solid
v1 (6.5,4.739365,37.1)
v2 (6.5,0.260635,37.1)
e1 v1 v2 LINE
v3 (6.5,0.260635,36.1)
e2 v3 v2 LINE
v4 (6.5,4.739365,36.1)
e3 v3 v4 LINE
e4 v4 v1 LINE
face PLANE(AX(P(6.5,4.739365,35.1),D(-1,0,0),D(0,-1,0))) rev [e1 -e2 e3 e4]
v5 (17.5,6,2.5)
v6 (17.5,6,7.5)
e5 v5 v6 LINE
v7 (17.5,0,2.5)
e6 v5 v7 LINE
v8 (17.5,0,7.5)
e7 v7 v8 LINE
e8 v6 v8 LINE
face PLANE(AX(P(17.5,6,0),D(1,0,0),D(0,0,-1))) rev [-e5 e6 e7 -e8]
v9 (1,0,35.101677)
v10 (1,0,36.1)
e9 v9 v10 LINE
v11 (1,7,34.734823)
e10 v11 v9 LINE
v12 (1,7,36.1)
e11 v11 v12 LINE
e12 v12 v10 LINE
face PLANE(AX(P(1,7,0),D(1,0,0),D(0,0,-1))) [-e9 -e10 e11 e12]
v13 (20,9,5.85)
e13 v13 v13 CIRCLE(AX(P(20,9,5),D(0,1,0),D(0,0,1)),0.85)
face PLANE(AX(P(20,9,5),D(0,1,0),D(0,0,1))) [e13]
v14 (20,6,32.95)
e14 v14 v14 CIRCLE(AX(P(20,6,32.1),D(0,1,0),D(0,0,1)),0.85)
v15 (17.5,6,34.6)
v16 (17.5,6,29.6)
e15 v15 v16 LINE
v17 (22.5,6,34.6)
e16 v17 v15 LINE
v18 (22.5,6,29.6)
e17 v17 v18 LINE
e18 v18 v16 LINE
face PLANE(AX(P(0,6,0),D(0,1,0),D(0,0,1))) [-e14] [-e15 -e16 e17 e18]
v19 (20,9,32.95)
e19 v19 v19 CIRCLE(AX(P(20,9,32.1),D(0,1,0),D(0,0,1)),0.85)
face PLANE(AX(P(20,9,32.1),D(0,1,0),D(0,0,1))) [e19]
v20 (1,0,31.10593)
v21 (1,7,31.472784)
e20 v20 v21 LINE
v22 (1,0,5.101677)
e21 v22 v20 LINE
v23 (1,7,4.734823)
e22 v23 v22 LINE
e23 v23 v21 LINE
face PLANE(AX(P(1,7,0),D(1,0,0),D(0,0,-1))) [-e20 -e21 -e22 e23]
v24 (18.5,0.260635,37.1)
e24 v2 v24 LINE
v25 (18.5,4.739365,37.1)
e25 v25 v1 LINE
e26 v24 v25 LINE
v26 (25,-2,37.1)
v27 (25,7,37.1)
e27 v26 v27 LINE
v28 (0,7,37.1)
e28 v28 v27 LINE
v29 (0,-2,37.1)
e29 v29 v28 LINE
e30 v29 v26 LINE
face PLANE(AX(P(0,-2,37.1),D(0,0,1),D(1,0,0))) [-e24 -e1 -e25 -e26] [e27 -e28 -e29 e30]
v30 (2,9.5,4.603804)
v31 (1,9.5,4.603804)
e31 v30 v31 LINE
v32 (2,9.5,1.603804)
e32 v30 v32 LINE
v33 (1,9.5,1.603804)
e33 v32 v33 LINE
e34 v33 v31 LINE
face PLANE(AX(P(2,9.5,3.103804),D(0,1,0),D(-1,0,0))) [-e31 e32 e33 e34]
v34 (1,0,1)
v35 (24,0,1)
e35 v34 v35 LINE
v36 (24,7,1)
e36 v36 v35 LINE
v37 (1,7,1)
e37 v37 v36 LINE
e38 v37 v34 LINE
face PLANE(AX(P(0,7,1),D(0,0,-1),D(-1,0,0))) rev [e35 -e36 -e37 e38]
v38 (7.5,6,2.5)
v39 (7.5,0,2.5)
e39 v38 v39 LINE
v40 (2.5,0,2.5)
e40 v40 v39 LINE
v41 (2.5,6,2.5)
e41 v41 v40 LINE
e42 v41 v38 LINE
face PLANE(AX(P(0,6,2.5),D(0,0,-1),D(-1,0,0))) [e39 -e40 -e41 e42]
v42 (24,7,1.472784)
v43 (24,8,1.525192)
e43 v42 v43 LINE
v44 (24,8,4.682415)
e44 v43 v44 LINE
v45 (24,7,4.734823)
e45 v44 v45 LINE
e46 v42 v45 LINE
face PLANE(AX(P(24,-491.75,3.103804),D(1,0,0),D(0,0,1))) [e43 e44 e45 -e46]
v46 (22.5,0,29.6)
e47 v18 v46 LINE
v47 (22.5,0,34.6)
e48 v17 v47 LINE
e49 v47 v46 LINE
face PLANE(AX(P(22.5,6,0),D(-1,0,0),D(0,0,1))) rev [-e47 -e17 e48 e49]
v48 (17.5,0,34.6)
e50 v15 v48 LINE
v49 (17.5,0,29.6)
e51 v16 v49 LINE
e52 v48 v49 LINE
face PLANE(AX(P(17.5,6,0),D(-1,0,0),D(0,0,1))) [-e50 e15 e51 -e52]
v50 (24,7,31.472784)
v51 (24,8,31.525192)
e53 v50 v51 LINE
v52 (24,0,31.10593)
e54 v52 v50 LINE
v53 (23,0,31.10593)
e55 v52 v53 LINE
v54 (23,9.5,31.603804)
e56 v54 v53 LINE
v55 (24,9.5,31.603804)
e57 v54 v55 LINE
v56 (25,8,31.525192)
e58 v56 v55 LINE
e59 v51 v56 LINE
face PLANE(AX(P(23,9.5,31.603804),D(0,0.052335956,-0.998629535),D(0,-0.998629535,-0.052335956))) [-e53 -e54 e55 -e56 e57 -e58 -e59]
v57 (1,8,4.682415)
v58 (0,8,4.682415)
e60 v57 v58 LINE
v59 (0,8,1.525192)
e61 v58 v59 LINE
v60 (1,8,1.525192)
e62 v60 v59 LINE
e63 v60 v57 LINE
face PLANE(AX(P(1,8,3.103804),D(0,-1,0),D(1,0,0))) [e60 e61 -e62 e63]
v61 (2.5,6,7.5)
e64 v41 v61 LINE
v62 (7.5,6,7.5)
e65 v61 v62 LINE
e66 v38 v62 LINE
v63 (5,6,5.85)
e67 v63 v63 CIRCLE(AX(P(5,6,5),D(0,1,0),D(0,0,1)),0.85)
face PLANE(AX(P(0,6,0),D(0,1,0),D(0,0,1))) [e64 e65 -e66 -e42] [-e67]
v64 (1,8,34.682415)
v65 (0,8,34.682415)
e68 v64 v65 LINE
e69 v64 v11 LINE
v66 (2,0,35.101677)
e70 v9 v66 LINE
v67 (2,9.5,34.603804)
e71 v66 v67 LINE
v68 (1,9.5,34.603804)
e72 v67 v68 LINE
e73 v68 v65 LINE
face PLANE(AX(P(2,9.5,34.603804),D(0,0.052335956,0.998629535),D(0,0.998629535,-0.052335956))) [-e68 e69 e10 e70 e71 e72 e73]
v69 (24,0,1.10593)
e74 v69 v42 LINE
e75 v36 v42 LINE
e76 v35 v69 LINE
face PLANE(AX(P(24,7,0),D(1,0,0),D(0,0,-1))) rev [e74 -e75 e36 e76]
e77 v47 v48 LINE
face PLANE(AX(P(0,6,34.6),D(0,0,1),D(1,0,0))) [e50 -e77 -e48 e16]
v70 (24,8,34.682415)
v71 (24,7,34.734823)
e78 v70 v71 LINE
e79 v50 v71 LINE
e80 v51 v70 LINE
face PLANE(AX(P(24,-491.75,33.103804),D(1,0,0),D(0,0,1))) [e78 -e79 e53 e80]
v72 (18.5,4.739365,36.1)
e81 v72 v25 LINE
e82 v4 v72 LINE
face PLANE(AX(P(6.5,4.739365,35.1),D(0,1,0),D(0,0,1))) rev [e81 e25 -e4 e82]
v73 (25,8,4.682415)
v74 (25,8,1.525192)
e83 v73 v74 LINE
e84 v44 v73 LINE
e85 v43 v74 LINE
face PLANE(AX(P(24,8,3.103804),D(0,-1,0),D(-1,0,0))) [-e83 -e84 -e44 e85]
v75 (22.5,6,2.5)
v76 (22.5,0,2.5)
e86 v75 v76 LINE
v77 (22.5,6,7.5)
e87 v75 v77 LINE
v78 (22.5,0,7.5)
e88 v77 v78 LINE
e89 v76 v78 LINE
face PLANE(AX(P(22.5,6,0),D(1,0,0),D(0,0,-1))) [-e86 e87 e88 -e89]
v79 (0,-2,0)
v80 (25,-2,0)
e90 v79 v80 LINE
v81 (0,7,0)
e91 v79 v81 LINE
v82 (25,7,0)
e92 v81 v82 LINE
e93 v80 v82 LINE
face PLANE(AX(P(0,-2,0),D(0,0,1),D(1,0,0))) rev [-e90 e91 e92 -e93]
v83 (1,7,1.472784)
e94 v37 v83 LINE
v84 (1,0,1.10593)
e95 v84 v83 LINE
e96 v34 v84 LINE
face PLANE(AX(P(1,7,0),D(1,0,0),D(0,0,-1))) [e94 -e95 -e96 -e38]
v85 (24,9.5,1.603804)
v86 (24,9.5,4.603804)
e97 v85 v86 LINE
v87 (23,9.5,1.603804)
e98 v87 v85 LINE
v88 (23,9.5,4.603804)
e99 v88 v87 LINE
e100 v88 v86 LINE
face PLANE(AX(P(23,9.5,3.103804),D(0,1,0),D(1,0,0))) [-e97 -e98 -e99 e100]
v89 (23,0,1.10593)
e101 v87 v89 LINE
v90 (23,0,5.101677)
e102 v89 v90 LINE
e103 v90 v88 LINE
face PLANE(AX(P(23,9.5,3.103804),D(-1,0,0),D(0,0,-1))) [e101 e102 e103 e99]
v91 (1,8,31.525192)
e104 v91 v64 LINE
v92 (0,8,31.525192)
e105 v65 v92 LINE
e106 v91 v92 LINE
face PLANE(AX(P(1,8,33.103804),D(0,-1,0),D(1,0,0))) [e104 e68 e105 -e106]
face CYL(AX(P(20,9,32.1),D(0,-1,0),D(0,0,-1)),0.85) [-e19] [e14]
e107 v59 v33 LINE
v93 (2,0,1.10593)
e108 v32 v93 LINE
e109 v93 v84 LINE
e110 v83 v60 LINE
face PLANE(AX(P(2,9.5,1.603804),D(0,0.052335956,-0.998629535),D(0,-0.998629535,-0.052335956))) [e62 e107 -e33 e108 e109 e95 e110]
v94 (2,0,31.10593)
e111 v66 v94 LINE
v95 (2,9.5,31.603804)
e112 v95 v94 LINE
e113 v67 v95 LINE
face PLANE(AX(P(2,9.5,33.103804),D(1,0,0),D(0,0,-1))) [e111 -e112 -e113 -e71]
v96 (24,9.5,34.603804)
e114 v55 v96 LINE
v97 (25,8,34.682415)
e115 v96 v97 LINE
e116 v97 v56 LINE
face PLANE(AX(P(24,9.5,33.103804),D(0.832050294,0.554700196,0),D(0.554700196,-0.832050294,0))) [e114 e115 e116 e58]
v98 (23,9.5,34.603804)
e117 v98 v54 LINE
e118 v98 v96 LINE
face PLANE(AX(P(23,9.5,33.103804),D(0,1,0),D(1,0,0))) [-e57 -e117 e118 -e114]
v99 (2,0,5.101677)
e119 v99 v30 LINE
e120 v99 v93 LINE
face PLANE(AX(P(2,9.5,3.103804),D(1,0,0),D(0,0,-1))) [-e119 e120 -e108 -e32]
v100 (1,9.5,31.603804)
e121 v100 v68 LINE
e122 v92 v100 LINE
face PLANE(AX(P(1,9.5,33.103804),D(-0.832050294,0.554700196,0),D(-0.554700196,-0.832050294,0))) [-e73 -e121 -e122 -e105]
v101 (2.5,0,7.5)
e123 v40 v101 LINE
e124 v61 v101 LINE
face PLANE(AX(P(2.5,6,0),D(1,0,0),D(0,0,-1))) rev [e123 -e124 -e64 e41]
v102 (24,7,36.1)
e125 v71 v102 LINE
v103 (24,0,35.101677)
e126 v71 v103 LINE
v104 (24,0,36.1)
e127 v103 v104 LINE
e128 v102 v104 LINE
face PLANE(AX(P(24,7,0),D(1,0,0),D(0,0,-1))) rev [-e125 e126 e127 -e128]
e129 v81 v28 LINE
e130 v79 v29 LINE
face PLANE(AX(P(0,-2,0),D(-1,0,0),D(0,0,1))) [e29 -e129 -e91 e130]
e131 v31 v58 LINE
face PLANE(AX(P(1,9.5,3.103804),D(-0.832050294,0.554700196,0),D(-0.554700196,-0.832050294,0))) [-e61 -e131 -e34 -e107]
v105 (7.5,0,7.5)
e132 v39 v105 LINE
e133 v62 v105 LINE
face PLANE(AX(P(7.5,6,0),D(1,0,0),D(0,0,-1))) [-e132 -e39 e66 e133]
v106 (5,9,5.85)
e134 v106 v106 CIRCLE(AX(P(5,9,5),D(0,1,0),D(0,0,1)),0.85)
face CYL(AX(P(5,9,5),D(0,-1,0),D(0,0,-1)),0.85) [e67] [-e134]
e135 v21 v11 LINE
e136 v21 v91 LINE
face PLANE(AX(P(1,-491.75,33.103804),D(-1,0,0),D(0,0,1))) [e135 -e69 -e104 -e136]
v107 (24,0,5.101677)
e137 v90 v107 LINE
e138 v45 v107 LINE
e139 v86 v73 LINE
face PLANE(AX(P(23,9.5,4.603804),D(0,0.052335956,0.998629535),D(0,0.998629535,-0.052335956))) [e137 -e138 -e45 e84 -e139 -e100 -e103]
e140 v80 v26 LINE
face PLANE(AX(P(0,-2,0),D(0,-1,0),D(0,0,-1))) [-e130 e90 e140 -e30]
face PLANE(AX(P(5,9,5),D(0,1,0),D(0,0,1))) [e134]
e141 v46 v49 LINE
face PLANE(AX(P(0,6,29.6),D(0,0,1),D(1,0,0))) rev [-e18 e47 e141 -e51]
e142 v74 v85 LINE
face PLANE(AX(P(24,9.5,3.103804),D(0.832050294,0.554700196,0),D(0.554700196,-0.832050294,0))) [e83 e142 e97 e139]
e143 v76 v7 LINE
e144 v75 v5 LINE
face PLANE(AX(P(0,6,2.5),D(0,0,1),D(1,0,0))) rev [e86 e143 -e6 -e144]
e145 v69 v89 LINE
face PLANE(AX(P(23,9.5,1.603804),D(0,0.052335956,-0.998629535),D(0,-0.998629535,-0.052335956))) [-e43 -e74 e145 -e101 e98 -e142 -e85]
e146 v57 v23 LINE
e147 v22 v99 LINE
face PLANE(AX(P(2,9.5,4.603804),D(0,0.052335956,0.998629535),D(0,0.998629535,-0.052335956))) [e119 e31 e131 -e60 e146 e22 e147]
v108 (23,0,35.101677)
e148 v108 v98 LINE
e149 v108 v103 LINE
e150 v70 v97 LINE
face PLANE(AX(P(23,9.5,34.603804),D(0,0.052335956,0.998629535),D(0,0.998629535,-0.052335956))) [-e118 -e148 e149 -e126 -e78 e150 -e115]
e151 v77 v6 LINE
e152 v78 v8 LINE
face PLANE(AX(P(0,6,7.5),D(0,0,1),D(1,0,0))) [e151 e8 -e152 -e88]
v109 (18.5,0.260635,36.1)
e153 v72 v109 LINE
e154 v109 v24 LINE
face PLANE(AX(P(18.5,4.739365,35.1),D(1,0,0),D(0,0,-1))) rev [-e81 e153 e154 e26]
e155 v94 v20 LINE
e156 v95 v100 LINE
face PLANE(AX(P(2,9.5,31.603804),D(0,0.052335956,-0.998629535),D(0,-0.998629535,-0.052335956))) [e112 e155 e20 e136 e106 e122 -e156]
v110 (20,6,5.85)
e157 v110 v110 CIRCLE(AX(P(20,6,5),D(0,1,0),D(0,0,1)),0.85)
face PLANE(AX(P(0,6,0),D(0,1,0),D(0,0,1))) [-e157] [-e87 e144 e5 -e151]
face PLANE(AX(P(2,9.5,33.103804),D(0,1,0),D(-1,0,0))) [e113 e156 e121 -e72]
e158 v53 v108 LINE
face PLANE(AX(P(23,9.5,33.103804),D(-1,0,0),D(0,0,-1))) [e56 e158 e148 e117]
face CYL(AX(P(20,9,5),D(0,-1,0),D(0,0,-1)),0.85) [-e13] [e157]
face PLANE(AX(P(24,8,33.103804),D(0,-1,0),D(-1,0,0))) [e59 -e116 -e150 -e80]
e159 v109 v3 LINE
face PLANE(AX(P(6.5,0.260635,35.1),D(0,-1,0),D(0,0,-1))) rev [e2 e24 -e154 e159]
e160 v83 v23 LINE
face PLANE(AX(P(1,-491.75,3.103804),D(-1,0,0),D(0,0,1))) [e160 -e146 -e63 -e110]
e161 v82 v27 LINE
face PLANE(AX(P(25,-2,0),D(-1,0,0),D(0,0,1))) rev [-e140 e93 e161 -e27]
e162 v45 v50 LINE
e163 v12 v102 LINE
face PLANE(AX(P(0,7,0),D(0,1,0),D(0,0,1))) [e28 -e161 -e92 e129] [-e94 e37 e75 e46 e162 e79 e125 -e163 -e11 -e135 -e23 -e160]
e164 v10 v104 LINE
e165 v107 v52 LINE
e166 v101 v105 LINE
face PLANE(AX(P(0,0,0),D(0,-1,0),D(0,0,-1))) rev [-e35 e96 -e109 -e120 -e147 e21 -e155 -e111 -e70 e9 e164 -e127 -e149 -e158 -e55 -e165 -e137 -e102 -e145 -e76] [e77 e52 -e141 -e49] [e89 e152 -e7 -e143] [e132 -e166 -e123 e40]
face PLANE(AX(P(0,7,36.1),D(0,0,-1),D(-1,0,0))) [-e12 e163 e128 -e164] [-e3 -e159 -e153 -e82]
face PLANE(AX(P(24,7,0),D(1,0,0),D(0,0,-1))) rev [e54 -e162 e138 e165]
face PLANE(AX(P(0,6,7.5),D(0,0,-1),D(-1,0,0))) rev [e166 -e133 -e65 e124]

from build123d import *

# Parameters (mm, degrees)
SKETCH2_W           = 25
SKETCH2_H           = 37.1
BOSS_EXTRUDE2_DEPTH = 2
SKETCH2_9_W         = 5
SKETCH2_9_H         = 5
SKETCH2_9_R         = 0.85
BOSS_EXTRUDE4_DEPTH = 6
SKETCH2_10_W        = 25
SKETCH2_10_H        = 37.1
SKETCH2_10_W_2      = 23
SKETCH2_10_H_2      = 35.1
BOSS_EXTRUDE5_DEPTH = 7
SNAP_START          = 1
SNAP_HOOK1_DEPTH    = 1
SNAP_START_2        = 1.525191878
SNAP_HOOK1_2_DEPTH  = 3.157223338
SNAP_START_3        = -1
SNAP_HOOK1_3_DEPTH  = 2
SNAP_HOOK1_4_DEPTH  = 1
LPATTERN1_START     = 1
LPATTERN1_DEPTH     = 1
LPATTERN1_START_2   = 31.525191878
LPATTERN1_2_DEPTH   = 3.157223338
LPATTERN1_START_3   = -1
LPATTERN1_3_DEPTH   = 2
LPATTERN1_4_DEPTH   = 1
SKETCH2_11_R        = 0.85
BOSS_EXTRUDE7_DEPTH = 9
SKETCH9_W           = 12
SKETCH9_H           = 4.478730726
CUT_EXTRUDE2_DEPTH  = 2


with BuildPart() as part:
    # Sketch2 → Boss-Extrude2 (new body)
    with BuildSketch(Plane(origin=(0, 0, 0), x_dir=(1, 0, 0), z_dir=(0, 1, 0))):
        with Locations((12.5, -18.55)):
            Rectangle(SKETCH2_W, SKETCH2_H)
    extrude(amount=-BOSS_EXTRUDE2_DEPTH)

    # Sketch2<9> → Boss-Extrude4 (add)
    # profile 1 of 3: a face of its own
    with BuildSketch(Plane(origin=(0, 0, 0), x_dir=(1, 0, 0), z_dir=(0, 1, 0))):
        with Locations((5, -5)):
            Rectangle(SKETCH2_9_W, SKETCH2_9_H)
        with Locations(Location((5, -5, 0), (0, 0, 270))):
            Circle(SKETCH2_9_R, mode=Mode.SUBTRACT)
    # profile 2 of 3: a face of its own
    with BuildSketch(Plane(origin=(0, 0, 0), x_dir=(1, 0, 0), z_dir=(0, 1, 0))):
        with Locations((20, -32.1)):
            Rectangle(SKETCH2_9_W, SKETCH2_9_H)
        with Locations(Location((20, -32.1, 0), (0, 0, 270))):
            Circle(SKETCH2_9_R, mode=Mode.SUBTRACT)
    # profile 3 of 3: a face of its own
    with BuildSketch(Plane(origin=(0, 0, 0), x_dir=(1, 0, 0), z_dir=(0, 1, 0))):
        with Locations((20, -5)):
            Rectangle(SKETCH2_9_W, SKETCH2_9_H)
        with Locations(Location((20, -5, 0), (0, 0, 270))):
            Circle(SKETCH2_9_R, mode=Mode.SUBTRACT)
    extrude(amount=BOSS_EXTRUDE4_DEPTH)

    # Sketch2<10> → Boss-Extrude5 (add)
    with BuildSketch(Plane(origin=(0, 0, 0), x_dir=(1, 0, 0), z_dir=(0, 1, 0))):
        with Locations((12.5, -18.55)):
            Rectangle(SKETCH2_10_W, SKETCH2_10_H)
        with Locations((12.5, -18.55)):
            Rectangle(SKETCH2_10_W_2, SKETCH2_10_H_2, mode=Mode.SUBTRACT)
    extrude(amount=BOSS_EXTRUDE5_DEPTH)



with BuildPart() as body_2:
    # Snap Hook1: read off the stored shape, not the designer's step
    # Snap Hook1 outline → Snap Hook1 (new body)
    with BuildSketch(Plane.YZ.offset(SNAP_START)):
        Polygon((8, 4.682415216), (8, 1.525191878), (9.5, 1.603803547), (9.5, 4.603803547), align=None)
    snap_hook1 = extrude(amount=SNAP_HOOK1_DEPTH)

    # Snap Hook1 2 outline → Snap Hook1 2 (add)
    with BuildSketch(Plane.XY.offset(SNAP_START_2)):
        Polygon((1, 8), (1, 9.5), (0, 8), align=None)
    snap_hook1_2 = extrude(amount=SNAP_HOOK1_2_DEPTH)

    # Snap Hook1 3 outline → Snap Hook1 3 (cut)
    with BuildSketch(Plane.YZ.offset(SNAP_START_3)):
        Polygon((9.5, 1.603803547), (8, 1.525191878), (11, 1.525191878), (11, 1.682415216), align=None)
        Polygon((11, 4.682415216), (8, 4.682415216), (9.5, 4.603803547), (11, 4.525191878), align=None)
    snap_hook1_3 = extrude(amount=SNAP_HOOK1_3_DEPTH, mode=Mode.SUBTRACT)


with BuildPart() as part_1:
    add(part.part)

    add(body_2.part)  # Snap Hook1 4 merges body 2
    # Snap Hook1 4 outline → Snap Hook1 4 (add)
    with BuildSketch(Plane.YZ.offset(SNAP_START)):
        Polygon((-1, 1.053521865), (0, 1.105929644), (8, 1.525191878), (8, 4.682415216), (0, 5.10167745), (-1, 5.154085229), align=None)
    snap_hook1_4 = extrude(amount=SNAP_HOOK1_4_DEPTH)



with BuildPart() as body_2_2:
    # LPattern1: read off the stored shape, not the designer's step
    # LPattern1 outline → LPattern1 (new body)
    with BuildSketch(Plane.YZ.offset(LPATTERN1_START)):
        Polygon((8, 31.525191878), (9.5, 31.603803547), (9.5, 34.603803547), (8, 34.682415216), align=None)
    lpattern1 = extrude(amount=LPATTERN1_DEPTH)

    # LPattern1 2 outline → LPattern1 2 (add)
    with BuildSketch(Plane.XY.offset(LPATTERN1_START_2)):
        Polygon((1, 8), (1, 9.5), (0, 8), align=None)
    lpattern1_2 = extrude(amount=LPATTERN1_2_DEPTH)

    # LPattern1 3 outline → LPattern1 3 (cut)
    with BuildSketch(Plane.YZ.offset(LPATTERN1_START_3)):
        Polygon((9.5, 31.603803547), (8, 31.525191878), (11, 31.525191878), (11, 31.682415216), align=None)
        Polygon((11, 34.682415216), (8, 34.682415216), (9.5, 34.603803547), (11, 34.525191878), align=None)
    lpattern1_3 = extrude(amount=LPATTERN1_3_DEPTH, mode=Mode.SUBTRACT)


with BuildPart() as part_2:
    add(part_1.part)

    add(body_2_2.part)  # LPattern1 4 merges body 2 2
    # LPattern1 4 outline → LPattern1 4 (add)
    with BuildSketch(Plane.YZ.offset(LPATTERN1_START)):
        Polygon((-1, 31.053521865), (0, 31.105929644), (8, 31.525191878), (8, 34.682415216), (0, 35.10167745), (-1, 35.154085229), align=None)
    lpattern1_4 = extrude(amount=LPATTERN1_4_DEPTH)

    # Mirror1: Snap Hook1, Snap Hook1 2, Snap Hook1 3, Snap Hook1 4, LPattern1, LPattern1 2, LPattern1 3, LPattern1 4 across plane
    add(snap_hook1.mirror(Plane.ZY.offset(-12.5)))
    add(snap_hook1_2.mirror(Plane.ZY.offset(-12.5)))
    add(snap_hook1_3.mirror(Plane.ZY.offset(-12.5)), mode=Mode.SUBTRACT)
    add(snap_hook1_4.mirror(Plane.ZY.offset(-12.5)))
    add(lpattern1.mirror(Plane.ZY.offset(-12.5)))
    add(lpattern1_2.mirror(Plane.ZY.offset(-12.5)))
    add(lpattern1_3.mirror(Plane.ZY.offset(-12.5)), mode=Mode.SUBTRACT)
    add(lpattern1_4.mirror(Plane.ZY.offset(-12.5)))

    # Sketch2<11> → Boss-Extrude7 (add)
    with BuildSketch(Plane(origin=(0, 0, 0), x_dir=(1, 0, 0), z_dir=(0, 1, 0))):
        with Locations(Location((20, -32.1, 0), (0, 0, 270))):
            Circle(SKETCH2_11_R)
        with Locations(Location((5, -5, 0), (0, 0, 270))):
            Circle(SKETCH2_11_R)
        with Locations(Location((20, -5, 0), (0, 0, 270))):
            Circle(SKETCH2_11_R)
    extrude(amount=BOSS_EXTRUDE7_DEPTH)

    # Sketch9 → Cut-Extrude2 (cut)
    with BuildSketch(Plane.XY.offset(37.1)):
        with Locations((12.5, 2.5)):
            Rectangle(SKETCH9_W, SKETCH9_H)
    extrude(amount=-CUT_EXTRUDE2_DEPTH, mode=Mode.SUBTRACT)


solid = part_2.part
